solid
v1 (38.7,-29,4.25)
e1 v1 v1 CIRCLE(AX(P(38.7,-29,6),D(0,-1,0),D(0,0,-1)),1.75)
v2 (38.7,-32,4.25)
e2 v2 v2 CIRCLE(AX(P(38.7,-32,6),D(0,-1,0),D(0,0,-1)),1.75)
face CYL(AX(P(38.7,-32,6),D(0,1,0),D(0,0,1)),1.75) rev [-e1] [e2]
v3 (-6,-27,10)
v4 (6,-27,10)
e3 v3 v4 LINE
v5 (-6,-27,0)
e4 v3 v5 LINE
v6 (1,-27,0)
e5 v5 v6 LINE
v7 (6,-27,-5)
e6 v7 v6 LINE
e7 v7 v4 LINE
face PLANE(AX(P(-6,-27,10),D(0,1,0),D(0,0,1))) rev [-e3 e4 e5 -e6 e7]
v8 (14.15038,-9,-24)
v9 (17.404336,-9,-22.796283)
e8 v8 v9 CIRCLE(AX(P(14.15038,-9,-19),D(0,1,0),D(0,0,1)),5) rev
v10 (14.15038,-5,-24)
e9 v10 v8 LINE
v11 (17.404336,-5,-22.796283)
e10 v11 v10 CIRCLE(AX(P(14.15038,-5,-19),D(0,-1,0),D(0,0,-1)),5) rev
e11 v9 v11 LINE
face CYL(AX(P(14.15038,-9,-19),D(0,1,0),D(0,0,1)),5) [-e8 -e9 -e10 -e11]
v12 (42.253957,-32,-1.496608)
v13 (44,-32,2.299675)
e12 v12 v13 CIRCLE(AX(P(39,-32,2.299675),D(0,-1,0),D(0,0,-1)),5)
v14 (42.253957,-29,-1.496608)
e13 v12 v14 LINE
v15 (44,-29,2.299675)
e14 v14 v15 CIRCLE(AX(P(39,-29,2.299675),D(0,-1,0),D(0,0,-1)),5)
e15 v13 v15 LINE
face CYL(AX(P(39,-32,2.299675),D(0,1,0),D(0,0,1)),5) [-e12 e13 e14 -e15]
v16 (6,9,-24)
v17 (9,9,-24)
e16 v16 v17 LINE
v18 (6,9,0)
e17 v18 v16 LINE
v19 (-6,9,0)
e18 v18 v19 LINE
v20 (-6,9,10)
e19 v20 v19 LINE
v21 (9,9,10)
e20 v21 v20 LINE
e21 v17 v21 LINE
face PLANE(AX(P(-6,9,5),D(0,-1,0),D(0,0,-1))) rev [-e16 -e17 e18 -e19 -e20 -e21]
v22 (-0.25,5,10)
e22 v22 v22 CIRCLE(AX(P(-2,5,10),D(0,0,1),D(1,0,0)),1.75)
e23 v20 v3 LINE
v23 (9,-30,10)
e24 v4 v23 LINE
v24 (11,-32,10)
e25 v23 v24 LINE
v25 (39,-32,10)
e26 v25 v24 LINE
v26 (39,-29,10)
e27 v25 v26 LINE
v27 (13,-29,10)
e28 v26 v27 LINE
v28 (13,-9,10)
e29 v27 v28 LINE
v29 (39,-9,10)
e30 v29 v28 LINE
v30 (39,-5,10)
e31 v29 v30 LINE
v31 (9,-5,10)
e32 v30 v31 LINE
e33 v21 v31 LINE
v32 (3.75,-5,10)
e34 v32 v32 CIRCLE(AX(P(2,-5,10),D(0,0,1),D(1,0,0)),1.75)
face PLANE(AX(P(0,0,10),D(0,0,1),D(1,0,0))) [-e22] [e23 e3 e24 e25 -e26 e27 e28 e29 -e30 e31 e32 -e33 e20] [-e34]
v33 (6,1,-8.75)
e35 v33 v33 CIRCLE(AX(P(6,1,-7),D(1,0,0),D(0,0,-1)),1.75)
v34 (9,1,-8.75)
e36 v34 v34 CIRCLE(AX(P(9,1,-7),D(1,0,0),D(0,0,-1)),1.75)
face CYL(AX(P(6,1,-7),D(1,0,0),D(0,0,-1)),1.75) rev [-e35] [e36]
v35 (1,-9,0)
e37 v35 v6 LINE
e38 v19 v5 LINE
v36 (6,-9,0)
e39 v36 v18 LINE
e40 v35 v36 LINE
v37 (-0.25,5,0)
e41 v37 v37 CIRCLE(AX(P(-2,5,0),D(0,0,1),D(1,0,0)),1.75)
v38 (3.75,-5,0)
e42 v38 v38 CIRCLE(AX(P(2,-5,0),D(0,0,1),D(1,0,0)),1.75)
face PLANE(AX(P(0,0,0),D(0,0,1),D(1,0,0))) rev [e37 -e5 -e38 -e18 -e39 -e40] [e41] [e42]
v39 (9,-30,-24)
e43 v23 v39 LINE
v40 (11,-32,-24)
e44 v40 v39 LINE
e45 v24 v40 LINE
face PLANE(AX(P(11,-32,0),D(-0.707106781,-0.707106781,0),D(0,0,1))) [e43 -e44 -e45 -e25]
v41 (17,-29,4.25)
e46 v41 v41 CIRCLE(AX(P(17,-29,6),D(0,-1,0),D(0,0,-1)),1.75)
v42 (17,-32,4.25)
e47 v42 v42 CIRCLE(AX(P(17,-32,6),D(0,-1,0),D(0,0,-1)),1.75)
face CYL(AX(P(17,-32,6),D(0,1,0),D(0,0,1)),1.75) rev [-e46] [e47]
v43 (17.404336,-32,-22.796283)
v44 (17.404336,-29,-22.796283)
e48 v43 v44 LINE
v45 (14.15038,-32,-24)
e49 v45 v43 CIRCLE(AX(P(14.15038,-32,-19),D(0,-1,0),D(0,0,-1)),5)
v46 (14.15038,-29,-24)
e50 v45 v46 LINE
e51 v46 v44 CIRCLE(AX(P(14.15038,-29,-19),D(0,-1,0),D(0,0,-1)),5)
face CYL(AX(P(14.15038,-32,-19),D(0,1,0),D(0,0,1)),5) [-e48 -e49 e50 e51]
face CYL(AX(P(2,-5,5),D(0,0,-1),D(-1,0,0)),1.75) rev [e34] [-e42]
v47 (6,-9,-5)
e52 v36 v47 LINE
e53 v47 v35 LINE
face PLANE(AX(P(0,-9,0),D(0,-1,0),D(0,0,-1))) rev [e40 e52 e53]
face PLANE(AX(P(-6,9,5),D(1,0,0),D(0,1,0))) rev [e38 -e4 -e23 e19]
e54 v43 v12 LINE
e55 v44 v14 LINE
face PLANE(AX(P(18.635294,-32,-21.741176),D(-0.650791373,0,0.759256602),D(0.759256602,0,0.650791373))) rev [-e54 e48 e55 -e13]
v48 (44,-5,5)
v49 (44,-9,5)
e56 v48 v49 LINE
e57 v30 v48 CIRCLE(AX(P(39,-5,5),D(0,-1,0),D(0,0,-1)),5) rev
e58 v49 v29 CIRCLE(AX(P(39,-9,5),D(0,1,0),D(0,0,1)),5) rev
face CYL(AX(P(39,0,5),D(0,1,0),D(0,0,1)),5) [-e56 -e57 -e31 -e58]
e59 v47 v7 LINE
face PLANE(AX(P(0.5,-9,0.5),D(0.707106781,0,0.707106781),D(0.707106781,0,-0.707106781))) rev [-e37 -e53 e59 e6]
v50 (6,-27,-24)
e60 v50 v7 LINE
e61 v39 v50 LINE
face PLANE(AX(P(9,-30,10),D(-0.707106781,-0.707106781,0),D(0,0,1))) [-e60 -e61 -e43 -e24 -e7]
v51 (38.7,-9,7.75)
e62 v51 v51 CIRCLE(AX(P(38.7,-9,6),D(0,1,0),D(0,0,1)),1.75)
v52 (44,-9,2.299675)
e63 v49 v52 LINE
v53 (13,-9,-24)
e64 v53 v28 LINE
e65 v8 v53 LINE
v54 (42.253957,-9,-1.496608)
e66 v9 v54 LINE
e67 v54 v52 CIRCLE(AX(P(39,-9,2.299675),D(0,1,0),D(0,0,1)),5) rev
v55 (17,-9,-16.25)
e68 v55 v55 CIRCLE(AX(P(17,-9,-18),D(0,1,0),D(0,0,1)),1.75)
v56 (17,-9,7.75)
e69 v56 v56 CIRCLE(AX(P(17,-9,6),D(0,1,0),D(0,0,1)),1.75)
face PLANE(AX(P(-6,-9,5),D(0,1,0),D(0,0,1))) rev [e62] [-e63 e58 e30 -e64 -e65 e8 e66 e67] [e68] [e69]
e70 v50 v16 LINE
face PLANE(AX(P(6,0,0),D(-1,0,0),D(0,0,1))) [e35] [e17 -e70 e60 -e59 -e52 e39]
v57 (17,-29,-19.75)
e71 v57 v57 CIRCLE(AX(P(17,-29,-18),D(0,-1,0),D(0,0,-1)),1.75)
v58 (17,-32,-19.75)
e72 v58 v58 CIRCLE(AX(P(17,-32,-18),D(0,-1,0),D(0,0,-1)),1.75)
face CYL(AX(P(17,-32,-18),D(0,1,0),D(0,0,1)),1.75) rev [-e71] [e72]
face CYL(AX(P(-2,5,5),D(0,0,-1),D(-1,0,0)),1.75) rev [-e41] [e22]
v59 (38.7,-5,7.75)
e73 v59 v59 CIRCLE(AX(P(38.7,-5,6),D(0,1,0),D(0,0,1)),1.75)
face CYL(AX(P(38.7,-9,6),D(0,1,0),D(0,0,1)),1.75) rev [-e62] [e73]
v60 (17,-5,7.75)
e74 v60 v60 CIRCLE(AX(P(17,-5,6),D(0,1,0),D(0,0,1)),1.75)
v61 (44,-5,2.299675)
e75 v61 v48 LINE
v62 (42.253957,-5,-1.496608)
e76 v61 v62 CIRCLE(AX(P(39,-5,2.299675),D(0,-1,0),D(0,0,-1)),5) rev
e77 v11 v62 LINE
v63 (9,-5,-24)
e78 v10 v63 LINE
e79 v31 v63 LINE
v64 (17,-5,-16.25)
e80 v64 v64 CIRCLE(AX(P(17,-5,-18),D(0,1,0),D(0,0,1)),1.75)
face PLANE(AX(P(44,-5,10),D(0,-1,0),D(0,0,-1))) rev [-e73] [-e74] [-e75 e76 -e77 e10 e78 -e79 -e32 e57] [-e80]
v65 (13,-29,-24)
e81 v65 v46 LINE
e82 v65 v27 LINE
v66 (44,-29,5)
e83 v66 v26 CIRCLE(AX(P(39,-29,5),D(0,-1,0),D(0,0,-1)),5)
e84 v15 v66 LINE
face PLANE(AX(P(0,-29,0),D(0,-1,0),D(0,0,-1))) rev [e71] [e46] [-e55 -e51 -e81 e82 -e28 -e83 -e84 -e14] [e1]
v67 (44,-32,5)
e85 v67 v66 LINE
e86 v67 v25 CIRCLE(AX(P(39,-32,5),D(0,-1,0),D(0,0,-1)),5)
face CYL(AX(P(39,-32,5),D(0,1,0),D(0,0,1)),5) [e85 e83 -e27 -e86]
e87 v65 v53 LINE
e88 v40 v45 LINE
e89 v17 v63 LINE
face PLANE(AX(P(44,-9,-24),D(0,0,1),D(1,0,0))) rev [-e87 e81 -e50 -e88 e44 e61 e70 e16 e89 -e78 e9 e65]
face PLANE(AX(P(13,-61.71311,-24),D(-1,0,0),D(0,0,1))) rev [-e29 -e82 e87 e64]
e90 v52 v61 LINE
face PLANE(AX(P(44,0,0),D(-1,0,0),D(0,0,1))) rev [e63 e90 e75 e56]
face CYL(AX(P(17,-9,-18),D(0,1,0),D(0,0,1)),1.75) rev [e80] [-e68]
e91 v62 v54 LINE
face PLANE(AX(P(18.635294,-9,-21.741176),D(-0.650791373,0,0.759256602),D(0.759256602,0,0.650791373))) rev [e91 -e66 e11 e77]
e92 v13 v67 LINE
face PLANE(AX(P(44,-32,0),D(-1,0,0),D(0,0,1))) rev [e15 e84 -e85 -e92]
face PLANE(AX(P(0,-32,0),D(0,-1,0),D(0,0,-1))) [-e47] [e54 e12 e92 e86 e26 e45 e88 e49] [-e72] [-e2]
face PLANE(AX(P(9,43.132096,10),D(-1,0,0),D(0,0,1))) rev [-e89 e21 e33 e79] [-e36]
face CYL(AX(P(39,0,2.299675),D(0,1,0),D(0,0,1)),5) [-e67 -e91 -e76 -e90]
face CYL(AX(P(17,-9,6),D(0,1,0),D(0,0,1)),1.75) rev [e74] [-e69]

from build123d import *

# Parameters (mm, degrees)
SZKIC1_W                     = 12
SZKIC1_H                     = 18
SZKIC1_R                     = 1.75
DODANIE_WYCI_GNI_CIE1_DEPTH  = 5
SZKIC2_W                     = 12
SZKIC2_H                     = 36
SZKIC2_R                     = 1.75
DODANIE_WYCI_GNI_CIE2_DEPTH  = 5
SZKIC5_W                     = 34
SZKIC5_H                     = 4
DODANIE_WYCI_GNI_CIE5_DEPTH  = 38
SZKIC6_W                     = 7
SZKIC6_H                     = 34
DODANIE_WYCI_GNI_CIE6_DEPTH  = 18
SZKIC7_R                     = 1.75
WYTNIJ_WYCI_GNI_CIE1_DEPTH   = 4
WYTNIJ_WYCI_GNI_CIE2_DEPTH   = 4
ZAOKR_GLENIE1_R              = 5
SZKIC9_W                     = 5
SZKIC9_H                     = 18
DODANIE_WYCI_GNI_CIE7_DEPTH  = 12
DODANIE_WYCI_GNI_CIE8_DEPTH  = 18
SZKIC11_W                    = 4
SZKIC11_H                    = 34
DODANIE_WYCI_GNI_CIE9_DEPTH  = 2
SZKIC12_R                    = 1.75
SZKIC12_W                    = 4
SZKIC12_H                    = 34
DODANIE_WYCI_GNI_CIE10_DEPTH = 3
SFAZOWANIE1_SIZE             = 3
SFAZOWANIE2_SIZE             = 2
SZKIC13_W                    = 3
SZKIC13_H                    = 34
DODANIE_WYCI_GNI_CIE11_DEPTH = 14
SZKIC14_R                    = 1.75
WYTNIJ_WYCI_GNI_CIE3_DEPTH   = 3


with BuildPart() as part:
    # Szkic1 → Dodanie-wyciągnięcie1 (new body)
    with BuildSketch(Plane.XY):
        Rectangle(SZKIC1_W, SZKIC1_H)
        with Locations((-2, 5)):
            Circle(SZKIC1_R, mode=Mode.SUBTRACT)
        with Locations((2, -5)):
            Circle(SZKIC1_R, mode=Mode.SUBTRACT)
    extrude(amount=DODANIE_WYCI_GNI_CIE1_DEPTH)

    # Szkic2 → Dodanie-wyciągnięcie2 (add)
    with BuildSketch(Plane.XY.offset(5)):
        with Locations((0, -9)):
            Rectangle(SZKIC2_W, SZKIC2_H)
        with Locations((-2, 5)):
            Circle(SZKIC2_R, mode=Mode.SUBTRACT)
        with Locations((2, -5)):
            Circle(SZKIC2_R, mode=Mode.SUBTRACT)
    extrude(amount=DODANIE_WYCI_GNI_CIE2_DEPTH)

    # Szkic5 → Dodanie-wyciągnięcie5 (add)
    with BuildSketch(Plane(origin=(6, 0, 0), x_dir=(0, 0, -1), z_dir=(1, 0, 0))):
        with Locations((7, -7)):
            Rectangle(SZKIC5_W, SZKIC5_H)
    extrude(amount=DODANIE_WYCI_GNI_CIE5_DEPTH)

    # Szkic6 → Dodanie-wyciągnięcie6 (add)
    with BuildSketch(Plane.XZ.offset(9)):
        with Locations((9.5, -7)):
            Rectangle(SZKIC6_W, SZKIC6_H)
    extrude(amount=DODANIE_WYCI_GNI_CIE6_DEPTH)

    # Szkic7 → Wytnij-wyciągnięcie1 (cut)
    with BuildSketch(Plane(origin=(0, -5, 0), x_dir=(1, 0, 0), z_dir=(0, 1, 0))):
        with Locations(Location((17, -6, 0), (0, 0, 270))):
            Circle(SZKIC7_R)
        with Locations(Location((17, 18, 0), (0, 0, 270))):
            Circle(SZKIC7_R)
        with Locations(Location((38.7, -6, 0), (0, 0, 270))):
            Circle(SZKIC7_R)
    extrude(amount=-WYTNIJ_WYCI_GNI_CIE1_DEPTH, mode=Mode.SUBTRACT)

    # Szkic8 → Wytnij-wyciągnięcie2 (cut)
    with BuildSketch(Plane(origin=(0, -5, 0), x_dir=(1, 0, 0), z_dir=(0, 1, 0))):
        Polygon((44, 24), (16, 24), (44, 0), align=None)
    extrude(amount=-WYTNIJ_WYCI_GNI_CIE2_DEPTH, mode=Mode.SUBTRACT)

    # Zaokrąglenie1
    zaokr_glenie1_edges = [part.edges().sort_by_distance(p)[0] for p in [
        (44, -7, 10),
        (16, -7, -24),
        (44, -7, 0),
    ]]
    fillet(zaokr_glenie1_edges, radius=ZAOKR_GLENIE1_R)

    # Szkic9 → Dodanie-wyciągnięcie7 (add)
    with BuildSketch(Plane.ZY.offset(-6)):
        with Locations((2.5, -18)):
            Rectangle(SZKIC9_W, SZKIC9_H)
    extrude(amount=DODANIE_WYCI_GNI_CIE7_DEPTH)

    # Szkic10 → Dodanie-wyciągnięcie8 (add)
    with BuildSketch(Plane.XZ.offset(27)):
        Polygon((6, 0), (1, 0), (6, -5), align=None)
    extrude(amount=-DODANIE_WYCI_GNI_CIE8_DEPTH)

    # Szkic11 → Dodanie-wyciągnięcie9 (add)
    with BuildSketch(Plane.XZ.offset(27)):
        with Locations((11, -7)):
            Rectangle(SZKIC11_W, SZKIC11_H)
    extrude(amount=DODANIE_WYCI_GNI_CIE9_DEPTH)

    # Szkic12 → Dodanie-wyciągnięcie10 (add)
    # profile 1 of 2: a face of its own
    with BuildSketch(Plane.XZ.offset(29)):
        with BuildLine():
            Line((44, 2.299674612), (44, 5))
            ThreePointArc((44, 5), (42.535533906, 8.535533906), (39, 10))
            Line((39, 10), (13, 10))
            Line((13, 10), (13, -24))
            Line((13, -24), (14.150379619, -24))
            ThreePointArc((14.150379619, -24), (15.885110858, -23.689425075), (17.404336486, -22.796283012))
            Line((17.404336486, -22.796283012), (42.253956867, -1.496608399))
            ThreePointArc((42.253956867, -1.496608399), (43.542564492, 0.210390565), (44, 2.299674612))
        make_face()
        with Locations(Location((38.7, 6, 0), (0, 0, 90))):
            Circle(SZKIC12_R, mode=Mode.SUBTRACT)
        with Locations(Location((17, -18, 0), (0, 0, 90))):
            Circle(SZKIC12_R, mode=Mode.SUBTRACT)
        with Locations(Location((17, 6, 0), (0, 0, 90))):
            Circle(SZKIC12_R, mode=Mode.SUBTRACT)
    # profile 2 of 2: a face of its own
    with BuildSketch(Plane.XZ.offset(29)):
        with Locations((11, -7)):
            Rectangle(SZKIC12_W, SZKIC12_H)
    extrude(amount=DODANIE_WYCI_GNI_CIE10_DEPTH)

    # Sfazowanie1
    sfazowanie1_edges = [part.edges().sort_by_distance(p)[0] for p in [
        (9, -27, -7),
    ]]
    chamfer(sfazowanie1_edges, length=SFAZOWANIE1_SIZE)

    # Sfazowanie2
    sfazowanie2_edges = [part.edges().sort_by_distance(p)[0] for p in [
        (9, -32, -7),
    ]]
    chamfer(sfazowanie2_edges, length=SFAZOWANIE2_SIZE - 0.0001)  # a hair under: the kernel refuses the full size

    # Szkic13 → Dodanie-wyciągnięcie11 (add)
    with BuildSketch(Plane(origin=(0, -5, 0), x_dir=(1, 0, 0), z_dir=(0, 1, 0))):
        with Locations((7.5, 7)):
            Rectangle(SZKIC13_W, SZKIC13_H)
    extrude(amount=DODANIE_WYCI_GNI_CIE11_DEPTH)

    # Szkic14 → Wytnij-wyciągnięcie3 (cut)
    with BuildSketch(Plane(origin=(9, 0, 0), x_dir=(0, 0, -1), z_dir=(1, 0, 0))):
        with Locations((7, 1)):
            Circle(SZKIC14_R)
    extrude(amount=-WYTNIJ_WYCI_GNI_CIE3_DEPTH, mode=Mode.SUBTRACT)


solid = part.part
